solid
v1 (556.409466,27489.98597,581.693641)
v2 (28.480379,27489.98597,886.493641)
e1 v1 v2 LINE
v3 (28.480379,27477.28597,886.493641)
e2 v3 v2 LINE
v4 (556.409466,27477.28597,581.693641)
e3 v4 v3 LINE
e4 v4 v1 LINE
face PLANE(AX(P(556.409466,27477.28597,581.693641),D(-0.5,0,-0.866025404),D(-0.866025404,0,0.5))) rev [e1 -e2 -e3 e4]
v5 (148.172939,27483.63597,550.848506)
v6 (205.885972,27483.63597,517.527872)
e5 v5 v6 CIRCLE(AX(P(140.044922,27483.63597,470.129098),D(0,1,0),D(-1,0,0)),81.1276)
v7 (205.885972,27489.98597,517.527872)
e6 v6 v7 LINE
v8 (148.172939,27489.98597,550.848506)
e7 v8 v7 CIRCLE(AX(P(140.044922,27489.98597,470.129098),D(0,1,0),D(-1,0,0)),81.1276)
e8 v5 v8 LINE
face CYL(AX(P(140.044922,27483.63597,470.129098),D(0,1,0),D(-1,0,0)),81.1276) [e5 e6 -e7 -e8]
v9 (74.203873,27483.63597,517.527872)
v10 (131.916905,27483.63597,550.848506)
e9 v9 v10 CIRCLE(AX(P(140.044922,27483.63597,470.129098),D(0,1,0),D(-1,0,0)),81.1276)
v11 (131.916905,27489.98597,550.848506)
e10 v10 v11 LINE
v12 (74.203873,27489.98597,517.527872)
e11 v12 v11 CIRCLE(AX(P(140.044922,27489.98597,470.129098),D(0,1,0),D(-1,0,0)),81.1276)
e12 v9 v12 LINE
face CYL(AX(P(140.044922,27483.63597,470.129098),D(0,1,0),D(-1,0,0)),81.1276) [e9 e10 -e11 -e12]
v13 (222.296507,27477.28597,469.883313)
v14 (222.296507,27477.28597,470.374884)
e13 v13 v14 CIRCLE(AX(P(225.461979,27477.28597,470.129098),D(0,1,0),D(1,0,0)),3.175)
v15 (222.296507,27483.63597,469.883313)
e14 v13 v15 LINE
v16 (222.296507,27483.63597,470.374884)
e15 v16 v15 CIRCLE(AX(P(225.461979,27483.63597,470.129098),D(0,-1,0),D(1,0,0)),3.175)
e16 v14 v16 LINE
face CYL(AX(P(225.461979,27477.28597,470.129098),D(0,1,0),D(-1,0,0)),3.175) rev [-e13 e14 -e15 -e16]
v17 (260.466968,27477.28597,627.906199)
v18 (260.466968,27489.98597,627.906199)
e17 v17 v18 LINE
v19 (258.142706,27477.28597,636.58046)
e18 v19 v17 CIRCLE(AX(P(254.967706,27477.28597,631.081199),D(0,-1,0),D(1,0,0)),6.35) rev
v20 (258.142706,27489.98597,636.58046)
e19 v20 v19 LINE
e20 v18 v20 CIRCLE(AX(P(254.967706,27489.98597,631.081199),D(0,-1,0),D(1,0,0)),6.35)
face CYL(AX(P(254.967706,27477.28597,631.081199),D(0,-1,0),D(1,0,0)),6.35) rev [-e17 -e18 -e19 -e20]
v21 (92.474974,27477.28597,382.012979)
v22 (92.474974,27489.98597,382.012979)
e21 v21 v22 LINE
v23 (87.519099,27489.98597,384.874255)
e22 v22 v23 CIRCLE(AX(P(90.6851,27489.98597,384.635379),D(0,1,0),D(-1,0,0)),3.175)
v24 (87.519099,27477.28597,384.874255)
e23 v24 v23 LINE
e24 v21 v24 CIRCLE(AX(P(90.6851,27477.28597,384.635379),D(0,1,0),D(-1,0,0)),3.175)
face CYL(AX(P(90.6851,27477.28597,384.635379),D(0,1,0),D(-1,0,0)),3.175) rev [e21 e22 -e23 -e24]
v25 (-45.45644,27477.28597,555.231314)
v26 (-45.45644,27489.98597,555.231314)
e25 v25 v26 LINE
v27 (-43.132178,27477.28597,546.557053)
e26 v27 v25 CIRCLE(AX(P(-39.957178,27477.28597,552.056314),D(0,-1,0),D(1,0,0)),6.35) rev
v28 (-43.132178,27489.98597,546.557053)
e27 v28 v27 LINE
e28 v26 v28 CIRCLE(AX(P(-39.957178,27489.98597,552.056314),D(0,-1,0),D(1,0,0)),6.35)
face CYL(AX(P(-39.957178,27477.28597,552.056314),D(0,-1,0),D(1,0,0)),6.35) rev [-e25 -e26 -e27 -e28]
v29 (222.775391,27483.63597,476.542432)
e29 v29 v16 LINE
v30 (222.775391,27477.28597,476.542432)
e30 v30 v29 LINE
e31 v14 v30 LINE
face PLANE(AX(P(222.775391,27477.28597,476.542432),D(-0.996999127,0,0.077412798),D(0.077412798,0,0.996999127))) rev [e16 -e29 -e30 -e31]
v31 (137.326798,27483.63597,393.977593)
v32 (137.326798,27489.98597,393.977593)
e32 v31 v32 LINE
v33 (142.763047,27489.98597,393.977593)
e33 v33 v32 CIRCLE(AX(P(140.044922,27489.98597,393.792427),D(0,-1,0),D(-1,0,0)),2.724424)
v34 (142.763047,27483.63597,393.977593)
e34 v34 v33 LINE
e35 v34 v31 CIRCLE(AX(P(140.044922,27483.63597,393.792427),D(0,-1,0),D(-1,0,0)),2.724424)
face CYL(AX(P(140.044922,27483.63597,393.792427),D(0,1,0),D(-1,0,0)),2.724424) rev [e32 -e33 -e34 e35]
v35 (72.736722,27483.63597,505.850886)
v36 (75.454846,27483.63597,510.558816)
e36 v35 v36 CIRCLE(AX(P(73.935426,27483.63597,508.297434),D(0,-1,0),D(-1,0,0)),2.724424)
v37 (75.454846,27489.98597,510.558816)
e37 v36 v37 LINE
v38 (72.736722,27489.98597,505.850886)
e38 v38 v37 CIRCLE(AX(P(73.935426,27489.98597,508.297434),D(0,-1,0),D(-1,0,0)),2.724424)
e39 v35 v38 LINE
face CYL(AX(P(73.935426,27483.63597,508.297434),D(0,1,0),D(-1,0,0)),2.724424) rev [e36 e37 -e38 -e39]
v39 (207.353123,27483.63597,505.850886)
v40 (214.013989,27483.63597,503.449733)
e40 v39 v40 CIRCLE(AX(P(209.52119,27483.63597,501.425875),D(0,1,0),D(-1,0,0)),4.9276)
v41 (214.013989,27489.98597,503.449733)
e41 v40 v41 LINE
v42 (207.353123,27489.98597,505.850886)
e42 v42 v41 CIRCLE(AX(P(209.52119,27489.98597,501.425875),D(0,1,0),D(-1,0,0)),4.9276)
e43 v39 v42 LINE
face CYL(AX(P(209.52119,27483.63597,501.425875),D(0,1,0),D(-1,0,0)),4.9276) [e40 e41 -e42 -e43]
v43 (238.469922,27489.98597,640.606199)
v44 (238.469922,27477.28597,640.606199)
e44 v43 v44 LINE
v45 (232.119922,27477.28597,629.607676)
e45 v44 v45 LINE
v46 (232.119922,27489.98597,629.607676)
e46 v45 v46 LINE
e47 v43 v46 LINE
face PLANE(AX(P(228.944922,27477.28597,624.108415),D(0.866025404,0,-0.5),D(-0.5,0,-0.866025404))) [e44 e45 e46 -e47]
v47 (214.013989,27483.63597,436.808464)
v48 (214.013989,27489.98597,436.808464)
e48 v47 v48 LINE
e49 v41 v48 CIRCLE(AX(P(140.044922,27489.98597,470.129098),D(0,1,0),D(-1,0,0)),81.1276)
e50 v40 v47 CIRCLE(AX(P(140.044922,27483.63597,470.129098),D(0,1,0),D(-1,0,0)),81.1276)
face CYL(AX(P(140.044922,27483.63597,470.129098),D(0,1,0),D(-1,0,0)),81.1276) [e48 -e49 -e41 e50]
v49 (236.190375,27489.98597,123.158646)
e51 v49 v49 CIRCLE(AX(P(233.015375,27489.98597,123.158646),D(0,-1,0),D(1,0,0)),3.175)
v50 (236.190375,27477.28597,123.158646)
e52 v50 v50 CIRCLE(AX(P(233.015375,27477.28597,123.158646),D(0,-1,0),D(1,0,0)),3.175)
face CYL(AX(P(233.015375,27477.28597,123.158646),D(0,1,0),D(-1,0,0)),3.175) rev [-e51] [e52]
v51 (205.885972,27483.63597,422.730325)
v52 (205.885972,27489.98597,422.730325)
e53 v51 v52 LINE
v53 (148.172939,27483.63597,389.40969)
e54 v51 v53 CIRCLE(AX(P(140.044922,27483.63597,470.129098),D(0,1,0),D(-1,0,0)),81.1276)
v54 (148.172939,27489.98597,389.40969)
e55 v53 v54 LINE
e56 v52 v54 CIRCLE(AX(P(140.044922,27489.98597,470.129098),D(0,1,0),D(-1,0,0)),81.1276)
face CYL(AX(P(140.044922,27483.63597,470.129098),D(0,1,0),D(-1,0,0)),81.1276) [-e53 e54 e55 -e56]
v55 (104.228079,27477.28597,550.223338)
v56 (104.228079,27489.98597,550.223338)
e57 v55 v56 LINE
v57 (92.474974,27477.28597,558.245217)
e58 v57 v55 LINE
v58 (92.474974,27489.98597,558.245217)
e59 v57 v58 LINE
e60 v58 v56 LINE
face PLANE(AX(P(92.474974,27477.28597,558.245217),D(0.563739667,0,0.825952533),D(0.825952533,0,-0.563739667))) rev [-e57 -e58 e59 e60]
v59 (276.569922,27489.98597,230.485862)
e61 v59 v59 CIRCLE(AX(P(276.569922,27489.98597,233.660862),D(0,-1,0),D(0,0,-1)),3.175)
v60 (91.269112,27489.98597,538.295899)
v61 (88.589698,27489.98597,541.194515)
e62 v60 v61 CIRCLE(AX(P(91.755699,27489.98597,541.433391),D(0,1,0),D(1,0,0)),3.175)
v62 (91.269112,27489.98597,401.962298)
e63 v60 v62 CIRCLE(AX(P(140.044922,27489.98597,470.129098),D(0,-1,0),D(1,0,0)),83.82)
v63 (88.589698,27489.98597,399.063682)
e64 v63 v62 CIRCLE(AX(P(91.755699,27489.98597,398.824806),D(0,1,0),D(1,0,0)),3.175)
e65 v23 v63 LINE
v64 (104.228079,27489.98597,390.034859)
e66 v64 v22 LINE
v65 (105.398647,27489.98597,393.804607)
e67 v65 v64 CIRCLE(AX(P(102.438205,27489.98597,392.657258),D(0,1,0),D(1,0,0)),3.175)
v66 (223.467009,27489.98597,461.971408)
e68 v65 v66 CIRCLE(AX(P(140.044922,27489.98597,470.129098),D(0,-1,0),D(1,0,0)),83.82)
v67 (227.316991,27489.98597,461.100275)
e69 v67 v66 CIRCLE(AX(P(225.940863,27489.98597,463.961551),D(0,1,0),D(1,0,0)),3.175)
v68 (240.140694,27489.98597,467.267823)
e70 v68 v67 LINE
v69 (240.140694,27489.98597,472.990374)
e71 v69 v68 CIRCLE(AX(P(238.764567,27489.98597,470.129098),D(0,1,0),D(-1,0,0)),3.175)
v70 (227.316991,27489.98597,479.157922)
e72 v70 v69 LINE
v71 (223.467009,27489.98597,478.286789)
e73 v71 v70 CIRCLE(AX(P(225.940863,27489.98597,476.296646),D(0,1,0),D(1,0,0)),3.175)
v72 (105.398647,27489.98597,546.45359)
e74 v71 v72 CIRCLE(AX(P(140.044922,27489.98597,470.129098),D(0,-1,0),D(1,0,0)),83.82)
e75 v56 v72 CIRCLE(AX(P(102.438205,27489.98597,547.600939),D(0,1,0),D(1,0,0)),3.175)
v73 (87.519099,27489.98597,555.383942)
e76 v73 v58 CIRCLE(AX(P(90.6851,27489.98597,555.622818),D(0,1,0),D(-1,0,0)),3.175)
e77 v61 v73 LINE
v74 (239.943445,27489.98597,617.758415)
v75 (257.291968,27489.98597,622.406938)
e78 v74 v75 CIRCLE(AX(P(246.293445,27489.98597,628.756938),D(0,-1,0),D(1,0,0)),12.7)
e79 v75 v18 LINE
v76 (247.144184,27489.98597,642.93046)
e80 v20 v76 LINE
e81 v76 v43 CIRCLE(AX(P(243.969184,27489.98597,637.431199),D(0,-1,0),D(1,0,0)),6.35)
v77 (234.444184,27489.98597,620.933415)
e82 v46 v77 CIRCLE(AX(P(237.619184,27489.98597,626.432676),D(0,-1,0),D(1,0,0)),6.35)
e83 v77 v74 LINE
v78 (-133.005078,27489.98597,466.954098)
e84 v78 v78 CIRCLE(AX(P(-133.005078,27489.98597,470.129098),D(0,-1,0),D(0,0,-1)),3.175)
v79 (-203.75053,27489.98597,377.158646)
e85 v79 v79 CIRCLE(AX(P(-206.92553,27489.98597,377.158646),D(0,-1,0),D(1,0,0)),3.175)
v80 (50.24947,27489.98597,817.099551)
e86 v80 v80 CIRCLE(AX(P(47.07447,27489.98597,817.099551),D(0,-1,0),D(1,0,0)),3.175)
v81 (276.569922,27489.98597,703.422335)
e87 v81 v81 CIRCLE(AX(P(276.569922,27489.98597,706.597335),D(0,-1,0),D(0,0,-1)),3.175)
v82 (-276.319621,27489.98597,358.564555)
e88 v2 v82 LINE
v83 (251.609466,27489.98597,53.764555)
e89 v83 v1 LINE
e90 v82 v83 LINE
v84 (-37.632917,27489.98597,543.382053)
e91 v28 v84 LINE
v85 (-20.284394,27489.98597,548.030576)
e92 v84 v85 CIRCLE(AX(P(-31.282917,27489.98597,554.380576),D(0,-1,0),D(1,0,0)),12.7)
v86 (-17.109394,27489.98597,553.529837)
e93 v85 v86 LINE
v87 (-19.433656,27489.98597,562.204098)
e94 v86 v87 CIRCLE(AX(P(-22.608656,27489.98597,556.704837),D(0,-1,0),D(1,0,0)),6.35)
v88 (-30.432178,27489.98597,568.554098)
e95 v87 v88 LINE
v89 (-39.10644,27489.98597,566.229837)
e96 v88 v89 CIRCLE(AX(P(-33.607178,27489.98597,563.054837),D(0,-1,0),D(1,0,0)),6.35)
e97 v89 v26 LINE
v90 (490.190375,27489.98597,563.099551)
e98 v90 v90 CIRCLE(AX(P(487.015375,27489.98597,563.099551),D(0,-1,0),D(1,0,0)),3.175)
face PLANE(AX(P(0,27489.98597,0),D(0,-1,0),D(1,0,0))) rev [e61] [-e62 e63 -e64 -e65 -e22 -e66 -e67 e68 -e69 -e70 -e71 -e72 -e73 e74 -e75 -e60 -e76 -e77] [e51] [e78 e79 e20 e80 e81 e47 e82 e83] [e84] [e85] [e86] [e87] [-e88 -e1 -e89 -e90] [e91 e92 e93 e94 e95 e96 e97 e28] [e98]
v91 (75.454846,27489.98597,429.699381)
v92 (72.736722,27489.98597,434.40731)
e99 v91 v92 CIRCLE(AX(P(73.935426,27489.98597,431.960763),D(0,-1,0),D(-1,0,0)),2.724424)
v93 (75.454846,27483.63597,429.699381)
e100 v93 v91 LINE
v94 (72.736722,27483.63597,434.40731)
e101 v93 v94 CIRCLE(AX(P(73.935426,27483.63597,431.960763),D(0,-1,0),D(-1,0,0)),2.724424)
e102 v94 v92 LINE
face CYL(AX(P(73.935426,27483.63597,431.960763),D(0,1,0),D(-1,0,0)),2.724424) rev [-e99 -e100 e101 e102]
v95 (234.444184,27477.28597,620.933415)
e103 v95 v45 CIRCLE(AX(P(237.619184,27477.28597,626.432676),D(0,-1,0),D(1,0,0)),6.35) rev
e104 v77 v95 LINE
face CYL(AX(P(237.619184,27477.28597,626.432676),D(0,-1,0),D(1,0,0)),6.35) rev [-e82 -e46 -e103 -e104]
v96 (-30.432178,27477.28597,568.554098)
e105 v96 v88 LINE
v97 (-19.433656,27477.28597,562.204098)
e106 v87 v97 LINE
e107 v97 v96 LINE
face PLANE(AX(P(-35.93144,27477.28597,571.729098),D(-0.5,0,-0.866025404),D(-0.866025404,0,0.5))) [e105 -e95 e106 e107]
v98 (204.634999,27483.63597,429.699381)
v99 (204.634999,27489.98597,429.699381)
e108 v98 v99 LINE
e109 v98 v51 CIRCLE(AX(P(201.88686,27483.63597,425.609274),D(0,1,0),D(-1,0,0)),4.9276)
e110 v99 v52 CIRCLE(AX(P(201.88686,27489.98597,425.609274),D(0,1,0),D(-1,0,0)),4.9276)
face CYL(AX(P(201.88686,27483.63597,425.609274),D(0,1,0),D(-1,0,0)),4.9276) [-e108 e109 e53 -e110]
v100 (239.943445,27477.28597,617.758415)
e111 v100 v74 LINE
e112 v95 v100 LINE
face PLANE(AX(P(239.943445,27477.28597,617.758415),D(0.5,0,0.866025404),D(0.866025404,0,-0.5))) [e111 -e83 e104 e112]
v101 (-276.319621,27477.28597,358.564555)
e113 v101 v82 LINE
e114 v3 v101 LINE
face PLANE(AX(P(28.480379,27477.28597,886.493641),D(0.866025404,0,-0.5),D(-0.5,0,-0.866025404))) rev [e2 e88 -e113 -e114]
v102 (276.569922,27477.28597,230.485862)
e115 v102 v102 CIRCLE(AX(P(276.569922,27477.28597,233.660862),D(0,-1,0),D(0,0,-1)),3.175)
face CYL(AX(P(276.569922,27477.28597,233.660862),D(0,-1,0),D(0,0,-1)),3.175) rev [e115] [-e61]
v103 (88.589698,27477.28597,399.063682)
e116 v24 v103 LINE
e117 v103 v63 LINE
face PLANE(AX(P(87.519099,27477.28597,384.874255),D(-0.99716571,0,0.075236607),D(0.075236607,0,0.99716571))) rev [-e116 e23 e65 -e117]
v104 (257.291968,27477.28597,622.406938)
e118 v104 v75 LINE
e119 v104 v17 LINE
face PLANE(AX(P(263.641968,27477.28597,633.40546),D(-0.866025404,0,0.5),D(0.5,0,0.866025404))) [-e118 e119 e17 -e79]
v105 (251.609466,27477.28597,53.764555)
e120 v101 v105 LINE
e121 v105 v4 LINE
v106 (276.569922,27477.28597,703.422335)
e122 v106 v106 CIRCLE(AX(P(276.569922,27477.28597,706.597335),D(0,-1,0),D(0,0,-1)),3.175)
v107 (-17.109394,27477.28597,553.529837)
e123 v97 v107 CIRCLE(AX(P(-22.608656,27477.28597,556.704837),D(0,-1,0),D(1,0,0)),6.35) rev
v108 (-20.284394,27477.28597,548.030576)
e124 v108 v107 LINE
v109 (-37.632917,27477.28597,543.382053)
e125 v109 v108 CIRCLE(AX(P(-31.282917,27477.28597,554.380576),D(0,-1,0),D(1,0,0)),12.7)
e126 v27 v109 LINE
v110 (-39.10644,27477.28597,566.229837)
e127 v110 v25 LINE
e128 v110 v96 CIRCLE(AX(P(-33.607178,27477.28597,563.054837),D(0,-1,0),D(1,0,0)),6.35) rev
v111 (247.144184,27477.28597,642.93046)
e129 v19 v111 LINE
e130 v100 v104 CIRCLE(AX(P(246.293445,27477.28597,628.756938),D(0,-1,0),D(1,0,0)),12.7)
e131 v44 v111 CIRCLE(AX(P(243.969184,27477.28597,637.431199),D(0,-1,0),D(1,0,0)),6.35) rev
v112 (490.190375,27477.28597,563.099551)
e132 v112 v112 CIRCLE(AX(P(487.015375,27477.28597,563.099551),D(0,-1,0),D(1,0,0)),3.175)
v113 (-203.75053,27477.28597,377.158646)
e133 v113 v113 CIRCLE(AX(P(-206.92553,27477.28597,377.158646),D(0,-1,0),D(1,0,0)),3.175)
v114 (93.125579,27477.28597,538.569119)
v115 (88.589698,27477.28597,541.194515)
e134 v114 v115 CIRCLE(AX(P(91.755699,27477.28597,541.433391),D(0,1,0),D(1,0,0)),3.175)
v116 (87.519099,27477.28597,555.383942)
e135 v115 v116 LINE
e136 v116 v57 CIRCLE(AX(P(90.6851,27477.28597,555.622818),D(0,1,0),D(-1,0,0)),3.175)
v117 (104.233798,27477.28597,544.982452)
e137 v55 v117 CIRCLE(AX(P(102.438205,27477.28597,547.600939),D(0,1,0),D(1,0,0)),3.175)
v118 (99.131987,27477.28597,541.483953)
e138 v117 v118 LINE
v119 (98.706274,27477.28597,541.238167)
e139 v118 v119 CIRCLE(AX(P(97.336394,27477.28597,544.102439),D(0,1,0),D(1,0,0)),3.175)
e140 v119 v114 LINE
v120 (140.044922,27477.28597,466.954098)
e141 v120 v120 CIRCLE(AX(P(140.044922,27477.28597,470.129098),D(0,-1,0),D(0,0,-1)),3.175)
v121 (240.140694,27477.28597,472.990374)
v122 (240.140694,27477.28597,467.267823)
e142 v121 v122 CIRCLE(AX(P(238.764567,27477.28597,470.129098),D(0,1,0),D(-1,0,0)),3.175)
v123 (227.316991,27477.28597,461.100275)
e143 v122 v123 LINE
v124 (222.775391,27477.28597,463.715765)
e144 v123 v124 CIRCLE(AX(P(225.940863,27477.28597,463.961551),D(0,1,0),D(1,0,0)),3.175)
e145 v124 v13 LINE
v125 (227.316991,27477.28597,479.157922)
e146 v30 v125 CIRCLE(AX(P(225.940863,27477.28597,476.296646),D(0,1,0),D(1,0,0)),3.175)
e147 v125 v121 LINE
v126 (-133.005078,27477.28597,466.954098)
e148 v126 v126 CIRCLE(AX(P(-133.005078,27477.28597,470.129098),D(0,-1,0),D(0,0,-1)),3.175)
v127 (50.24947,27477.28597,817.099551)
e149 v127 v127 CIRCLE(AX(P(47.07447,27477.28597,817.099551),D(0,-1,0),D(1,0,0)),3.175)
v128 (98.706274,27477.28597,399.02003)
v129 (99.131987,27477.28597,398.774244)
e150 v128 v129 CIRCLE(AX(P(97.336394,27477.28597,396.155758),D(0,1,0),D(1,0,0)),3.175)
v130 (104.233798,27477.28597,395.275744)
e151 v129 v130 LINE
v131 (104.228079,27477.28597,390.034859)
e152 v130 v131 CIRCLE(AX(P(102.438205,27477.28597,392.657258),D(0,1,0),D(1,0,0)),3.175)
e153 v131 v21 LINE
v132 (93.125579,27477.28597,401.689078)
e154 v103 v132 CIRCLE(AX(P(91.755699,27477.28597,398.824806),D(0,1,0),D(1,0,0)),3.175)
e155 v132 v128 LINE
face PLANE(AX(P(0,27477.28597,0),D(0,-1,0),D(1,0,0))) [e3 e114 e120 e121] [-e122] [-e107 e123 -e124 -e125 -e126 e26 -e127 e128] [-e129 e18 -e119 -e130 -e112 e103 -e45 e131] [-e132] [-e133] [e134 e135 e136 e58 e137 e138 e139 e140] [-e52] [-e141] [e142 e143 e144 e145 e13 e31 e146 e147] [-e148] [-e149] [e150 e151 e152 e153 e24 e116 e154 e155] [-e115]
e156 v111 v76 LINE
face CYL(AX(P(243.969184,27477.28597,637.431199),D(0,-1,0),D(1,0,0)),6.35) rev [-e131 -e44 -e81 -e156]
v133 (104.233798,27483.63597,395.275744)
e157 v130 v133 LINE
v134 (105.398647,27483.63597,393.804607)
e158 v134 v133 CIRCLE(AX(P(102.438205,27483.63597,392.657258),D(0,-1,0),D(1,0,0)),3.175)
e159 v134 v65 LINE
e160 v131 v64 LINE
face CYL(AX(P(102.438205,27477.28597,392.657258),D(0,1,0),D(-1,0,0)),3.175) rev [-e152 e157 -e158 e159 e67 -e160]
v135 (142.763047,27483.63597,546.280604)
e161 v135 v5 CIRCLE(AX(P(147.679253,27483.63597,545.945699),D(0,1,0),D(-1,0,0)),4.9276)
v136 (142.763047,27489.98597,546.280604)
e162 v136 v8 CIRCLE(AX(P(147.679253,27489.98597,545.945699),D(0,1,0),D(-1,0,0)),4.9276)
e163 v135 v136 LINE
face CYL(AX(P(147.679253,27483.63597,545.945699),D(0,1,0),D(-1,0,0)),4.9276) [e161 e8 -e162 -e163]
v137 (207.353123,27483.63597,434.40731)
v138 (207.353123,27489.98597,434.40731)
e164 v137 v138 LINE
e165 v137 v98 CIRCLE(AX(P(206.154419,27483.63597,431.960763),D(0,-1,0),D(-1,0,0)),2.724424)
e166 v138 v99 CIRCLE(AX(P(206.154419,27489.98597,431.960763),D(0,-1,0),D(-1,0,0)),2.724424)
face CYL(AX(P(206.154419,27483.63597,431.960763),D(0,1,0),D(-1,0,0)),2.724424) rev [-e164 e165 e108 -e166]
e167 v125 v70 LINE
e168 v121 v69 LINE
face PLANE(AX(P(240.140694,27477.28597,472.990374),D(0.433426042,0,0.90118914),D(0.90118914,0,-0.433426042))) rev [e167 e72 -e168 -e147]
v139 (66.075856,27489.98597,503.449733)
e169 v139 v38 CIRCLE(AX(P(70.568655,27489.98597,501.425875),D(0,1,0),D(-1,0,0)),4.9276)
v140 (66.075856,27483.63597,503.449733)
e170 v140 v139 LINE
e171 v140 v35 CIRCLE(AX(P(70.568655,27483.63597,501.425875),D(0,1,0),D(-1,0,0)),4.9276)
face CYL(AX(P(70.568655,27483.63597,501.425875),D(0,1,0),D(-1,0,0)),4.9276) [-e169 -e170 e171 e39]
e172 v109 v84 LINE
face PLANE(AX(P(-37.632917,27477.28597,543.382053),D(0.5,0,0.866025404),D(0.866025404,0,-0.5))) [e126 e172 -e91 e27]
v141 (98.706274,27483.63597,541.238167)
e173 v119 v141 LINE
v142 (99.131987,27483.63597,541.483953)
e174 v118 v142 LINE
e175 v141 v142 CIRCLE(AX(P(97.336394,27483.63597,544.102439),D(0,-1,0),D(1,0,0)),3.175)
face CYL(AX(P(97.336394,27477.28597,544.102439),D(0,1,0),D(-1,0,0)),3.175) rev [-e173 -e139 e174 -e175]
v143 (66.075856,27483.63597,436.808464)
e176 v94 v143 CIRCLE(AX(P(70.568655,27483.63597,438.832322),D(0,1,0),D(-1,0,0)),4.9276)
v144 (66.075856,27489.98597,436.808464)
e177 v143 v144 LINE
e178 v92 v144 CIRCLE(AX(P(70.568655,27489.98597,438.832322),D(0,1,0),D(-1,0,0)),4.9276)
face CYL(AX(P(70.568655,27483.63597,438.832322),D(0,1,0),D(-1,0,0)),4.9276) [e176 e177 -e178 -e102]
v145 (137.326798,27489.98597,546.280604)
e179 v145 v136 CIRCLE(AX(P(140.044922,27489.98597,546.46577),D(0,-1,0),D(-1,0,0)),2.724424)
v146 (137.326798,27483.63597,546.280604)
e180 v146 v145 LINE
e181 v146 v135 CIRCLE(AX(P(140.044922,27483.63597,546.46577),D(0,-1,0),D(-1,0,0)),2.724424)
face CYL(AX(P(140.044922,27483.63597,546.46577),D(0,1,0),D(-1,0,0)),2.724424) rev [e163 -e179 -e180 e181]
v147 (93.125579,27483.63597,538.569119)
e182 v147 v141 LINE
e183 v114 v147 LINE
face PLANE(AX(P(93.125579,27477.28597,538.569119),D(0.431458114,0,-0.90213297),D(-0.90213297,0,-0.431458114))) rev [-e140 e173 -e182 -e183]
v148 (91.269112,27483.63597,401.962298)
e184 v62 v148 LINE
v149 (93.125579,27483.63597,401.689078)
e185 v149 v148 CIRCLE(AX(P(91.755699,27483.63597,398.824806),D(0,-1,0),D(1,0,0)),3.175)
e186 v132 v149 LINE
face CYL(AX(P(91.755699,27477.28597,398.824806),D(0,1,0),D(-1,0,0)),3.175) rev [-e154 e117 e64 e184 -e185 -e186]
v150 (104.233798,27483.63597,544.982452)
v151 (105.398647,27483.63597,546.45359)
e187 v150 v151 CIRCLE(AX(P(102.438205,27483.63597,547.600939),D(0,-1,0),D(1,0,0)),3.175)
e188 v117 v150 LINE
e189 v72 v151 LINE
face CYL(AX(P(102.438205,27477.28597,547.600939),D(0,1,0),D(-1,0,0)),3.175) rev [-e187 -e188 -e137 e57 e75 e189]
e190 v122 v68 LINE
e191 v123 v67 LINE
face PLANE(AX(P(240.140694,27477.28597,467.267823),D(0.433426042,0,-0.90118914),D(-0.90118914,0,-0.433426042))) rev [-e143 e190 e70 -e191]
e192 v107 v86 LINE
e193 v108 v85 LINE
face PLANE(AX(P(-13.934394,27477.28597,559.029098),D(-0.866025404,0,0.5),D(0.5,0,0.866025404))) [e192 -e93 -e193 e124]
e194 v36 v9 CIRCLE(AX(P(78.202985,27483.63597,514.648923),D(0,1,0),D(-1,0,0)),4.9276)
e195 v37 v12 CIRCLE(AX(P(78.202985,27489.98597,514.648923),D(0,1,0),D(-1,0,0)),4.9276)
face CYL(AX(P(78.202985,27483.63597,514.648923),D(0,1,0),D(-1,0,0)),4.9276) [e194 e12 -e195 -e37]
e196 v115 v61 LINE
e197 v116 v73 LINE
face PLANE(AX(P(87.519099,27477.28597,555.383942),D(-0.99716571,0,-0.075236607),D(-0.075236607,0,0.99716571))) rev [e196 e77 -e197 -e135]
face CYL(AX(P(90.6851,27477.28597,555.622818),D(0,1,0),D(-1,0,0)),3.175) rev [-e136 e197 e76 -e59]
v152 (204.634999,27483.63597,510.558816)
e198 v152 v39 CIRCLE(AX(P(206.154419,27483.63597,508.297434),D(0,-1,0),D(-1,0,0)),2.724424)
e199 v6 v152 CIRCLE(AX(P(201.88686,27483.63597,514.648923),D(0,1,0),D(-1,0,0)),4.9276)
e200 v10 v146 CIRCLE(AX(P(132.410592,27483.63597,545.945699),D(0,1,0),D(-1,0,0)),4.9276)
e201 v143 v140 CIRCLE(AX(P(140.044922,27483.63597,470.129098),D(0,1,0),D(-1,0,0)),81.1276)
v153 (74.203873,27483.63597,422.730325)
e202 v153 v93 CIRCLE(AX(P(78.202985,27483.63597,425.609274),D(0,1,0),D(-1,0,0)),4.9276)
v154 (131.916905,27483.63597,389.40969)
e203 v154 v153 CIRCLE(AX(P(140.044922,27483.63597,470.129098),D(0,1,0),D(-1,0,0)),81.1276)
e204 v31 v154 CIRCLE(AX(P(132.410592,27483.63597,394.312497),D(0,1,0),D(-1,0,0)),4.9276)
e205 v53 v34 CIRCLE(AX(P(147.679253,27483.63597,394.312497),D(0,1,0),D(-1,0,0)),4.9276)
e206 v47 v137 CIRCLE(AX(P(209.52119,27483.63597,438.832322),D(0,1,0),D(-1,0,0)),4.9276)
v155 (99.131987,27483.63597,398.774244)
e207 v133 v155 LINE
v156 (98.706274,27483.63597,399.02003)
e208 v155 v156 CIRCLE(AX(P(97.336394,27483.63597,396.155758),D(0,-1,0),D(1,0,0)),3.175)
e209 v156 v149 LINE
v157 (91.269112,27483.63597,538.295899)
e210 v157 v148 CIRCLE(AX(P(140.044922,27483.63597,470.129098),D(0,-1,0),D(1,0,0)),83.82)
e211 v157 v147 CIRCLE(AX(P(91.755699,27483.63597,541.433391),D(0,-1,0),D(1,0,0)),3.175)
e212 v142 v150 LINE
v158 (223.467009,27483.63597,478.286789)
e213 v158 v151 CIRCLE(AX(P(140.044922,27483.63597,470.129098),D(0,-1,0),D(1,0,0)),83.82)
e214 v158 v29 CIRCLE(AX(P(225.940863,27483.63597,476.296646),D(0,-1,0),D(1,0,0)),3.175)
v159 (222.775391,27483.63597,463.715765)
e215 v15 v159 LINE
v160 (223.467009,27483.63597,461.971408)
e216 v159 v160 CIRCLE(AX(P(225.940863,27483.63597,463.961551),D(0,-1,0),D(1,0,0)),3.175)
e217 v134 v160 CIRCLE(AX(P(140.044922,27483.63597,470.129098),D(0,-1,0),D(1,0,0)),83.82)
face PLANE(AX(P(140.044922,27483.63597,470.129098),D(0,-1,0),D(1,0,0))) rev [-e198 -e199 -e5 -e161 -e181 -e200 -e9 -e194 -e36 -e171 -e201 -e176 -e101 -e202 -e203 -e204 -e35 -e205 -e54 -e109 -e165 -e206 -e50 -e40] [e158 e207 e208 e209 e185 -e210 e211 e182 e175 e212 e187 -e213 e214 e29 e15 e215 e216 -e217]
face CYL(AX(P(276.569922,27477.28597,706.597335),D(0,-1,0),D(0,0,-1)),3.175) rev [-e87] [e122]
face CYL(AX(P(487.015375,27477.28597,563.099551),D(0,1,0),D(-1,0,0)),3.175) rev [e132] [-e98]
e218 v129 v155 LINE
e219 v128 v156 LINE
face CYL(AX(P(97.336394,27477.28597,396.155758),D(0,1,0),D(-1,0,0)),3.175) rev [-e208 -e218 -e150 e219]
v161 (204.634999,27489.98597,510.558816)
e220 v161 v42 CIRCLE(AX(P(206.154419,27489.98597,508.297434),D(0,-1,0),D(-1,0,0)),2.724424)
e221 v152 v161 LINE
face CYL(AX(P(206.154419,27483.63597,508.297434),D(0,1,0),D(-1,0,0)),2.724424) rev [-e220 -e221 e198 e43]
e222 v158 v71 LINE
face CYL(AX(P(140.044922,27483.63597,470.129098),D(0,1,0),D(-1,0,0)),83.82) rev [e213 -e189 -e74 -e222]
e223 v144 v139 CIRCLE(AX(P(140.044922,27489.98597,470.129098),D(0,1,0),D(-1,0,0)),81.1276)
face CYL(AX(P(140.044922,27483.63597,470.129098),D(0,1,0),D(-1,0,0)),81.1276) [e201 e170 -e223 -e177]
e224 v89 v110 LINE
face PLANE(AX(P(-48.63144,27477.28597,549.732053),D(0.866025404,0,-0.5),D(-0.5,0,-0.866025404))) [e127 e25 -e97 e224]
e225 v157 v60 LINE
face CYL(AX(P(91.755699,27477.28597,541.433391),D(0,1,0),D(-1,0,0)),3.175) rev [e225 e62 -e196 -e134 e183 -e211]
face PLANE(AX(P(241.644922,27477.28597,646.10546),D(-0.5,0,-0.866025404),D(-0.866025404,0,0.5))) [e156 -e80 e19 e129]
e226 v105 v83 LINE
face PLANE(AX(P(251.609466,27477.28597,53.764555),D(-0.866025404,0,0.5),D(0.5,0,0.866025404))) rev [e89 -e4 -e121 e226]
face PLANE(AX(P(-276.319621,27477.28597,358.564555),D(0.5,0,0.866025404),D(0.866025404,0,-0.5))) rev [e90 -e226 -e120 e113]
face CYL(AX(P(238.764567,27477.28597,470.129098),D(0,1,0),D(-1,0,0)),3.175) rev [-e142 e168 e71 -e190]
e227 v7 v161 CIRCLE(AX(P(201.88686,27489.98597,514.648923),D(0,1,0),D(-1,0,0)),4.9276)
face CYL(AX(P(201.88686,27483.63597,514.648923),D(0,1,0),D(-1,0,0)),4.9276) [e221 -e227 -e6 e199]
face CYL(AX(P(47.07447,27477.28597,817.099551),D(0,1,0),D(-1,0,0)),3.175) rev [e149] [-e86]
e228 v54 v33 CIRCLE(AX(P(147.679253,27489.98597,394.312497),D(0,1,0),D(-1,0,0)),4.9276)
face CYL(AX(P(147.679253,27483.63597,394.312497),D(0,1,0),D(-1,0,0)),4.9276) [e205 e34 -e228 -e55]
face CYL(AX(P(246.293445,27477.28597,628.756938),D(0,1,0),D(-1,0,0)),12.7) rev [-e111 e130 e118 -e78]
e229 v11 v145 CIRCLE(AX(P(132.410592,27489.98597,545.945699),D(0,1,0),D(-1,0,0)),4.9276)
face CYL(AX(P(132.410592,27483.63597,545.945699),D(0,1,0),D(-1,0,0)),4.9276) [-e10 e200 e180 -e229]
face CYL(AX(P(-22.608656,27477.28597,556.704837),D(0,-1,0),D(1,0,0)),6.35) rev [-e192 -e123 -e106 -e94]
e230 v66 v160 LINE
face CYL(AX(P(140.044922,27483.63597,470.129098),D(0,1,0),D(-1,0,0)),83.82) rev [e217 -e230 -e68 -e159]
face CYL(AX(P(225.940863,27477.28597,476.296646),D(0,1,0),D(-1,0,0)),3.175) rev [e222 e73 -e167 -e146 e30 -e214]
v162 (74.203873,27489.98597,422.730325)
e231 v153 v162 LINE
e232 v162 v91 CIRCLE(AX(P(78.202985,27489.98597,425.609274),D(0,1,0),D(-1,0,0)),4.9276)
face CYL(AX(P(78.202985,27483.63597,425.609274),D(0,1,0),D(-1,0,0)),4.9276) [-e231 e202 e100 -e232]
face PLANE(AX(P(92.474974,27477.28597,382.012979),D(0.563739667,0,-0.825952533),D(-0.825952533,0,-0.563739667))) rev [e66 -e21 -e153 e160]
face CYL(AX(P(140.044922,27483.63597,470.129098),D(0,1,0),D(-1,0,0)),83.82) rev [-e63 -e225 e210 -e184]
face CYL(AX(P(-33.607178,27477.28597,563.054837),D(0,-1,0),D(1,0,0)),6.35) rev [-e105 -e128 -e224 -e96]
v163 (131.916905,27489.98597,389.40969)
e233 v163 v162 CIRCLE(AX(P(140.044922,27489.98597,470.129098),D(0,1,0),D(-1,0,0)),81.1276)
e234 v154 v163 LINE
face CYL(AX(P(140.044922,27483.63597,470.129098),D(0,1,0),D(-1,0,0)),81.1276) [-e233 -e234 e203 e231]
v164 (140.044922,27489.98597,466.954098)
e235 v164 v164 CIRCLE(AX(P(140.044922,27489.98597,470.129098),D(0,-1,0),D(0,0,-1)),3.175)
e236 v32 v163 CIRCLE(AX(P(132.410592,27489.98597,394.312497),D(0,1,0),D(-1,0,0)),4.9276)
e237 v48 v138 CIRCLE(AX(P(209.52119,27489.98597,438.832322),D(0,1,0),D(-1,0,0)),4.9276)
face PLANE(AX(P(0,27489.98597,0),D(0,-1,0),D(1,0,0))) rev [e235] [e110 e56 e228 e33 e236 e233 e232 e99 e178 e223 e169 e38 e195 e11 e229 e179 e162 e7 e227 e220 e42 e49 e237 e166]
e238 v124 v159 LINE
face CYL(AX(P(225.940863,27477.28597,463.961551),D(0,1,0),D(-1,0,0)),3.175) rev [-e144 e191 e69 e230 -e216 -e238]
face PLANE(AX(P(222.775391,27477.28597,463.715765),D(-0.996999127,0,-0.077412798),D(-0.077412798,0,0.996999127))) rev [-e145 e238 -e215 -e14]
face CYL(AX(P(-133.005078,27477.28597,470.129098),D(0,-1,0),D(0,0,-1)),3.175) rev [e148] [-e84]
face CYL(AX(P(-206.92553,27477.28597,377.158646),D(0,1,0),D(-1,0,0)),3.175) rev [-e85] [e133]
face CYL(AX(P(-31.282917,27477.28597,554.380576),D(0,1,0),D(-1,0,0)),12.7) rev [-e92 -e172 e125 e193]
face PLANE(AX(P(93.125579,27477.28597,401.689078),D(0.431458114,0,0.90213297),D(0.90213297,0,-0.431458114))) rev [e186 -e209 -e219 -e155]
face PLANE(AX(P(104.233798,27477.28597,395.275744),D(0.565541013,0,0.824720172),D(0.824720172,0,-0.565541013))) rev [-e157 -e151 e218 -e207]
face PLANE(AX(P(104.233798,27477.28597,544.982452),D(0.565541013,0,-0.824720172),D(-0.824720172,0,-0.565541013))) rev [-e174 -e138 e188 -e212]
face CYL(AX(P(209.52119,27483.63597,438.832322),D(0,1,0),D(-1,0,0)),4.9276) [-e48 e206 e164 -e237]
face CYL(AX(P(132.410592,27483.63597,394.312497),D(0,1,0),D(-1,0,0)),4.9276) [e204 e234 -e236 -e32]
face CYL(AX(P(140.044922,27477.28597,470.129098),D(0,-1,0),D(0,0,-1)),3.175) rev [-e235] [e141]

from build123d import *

# Parameters (mm, degrees)
SKETCH1_R                   = 3.175
BOSS_EXTRUDE1_DEPTH         = 12.7
SKETCH3_R                   = 83.82
SKETCH3_R_2                 = 81.9404
CUT_EXTRUDE1_DEPTH          = 6.35
CUT_EXTRUDE2_START          = -6.35
CUT_EXTRUDE2_OUTLINE_R      = 81.9404
CUT_EXTRUDE2_DEPTH          = 6.35
F_1_4_0_25_DIAMETER_HOLE1_D = 6.35
FILLET1_R                   = 6.35
CUT_EXTRUDE3_DEPTH          = 1047.720478305


# Read off the part's stored shape, not the designer's step: Cut-Extrude2
with BuildPart() as part:
    # Sketch1 → Boss-Extrude1 (new body)
    with BuildSketch(Plane.XZ.offset(-27489.985969718)):
        Polygon((556.409465543, 581.693641464), (28.480379396, 886.493641464), (-276.319620604, 358.564555317), (251.609465543, 53.764555317), align=None)
        with Locations((-206.925530091, 377.158645829)):
            Circle(SKETCH1_R, mode=Mode.SUBTRACT)
        with Locations((233.015375031, 123.158645829)):
            Circle(SKETCH1_R, mode=Mode.SUBTRACT)
        with Locations((487.015375031, 563.099550952)):
            Circle(SKETCH1_R, mode=Mode.SUBTRACT)
        with Locations((47.074469909, 817.099550952)):
            Circle(SKETCH1_R, mode=Mode.SUBTRACT)
        with BuildLine():
            Line((-37.632916951, 543.382053135), (-48.631439579, 549.732053135))
            Line((-48.631439579, 549.732053135), (-35.931439579, 571.729098391))
            Line((-35.931439579, 571.729098391), (-13.934394323, 559.029098391))
            Line((-13.934394323, 559.029098391), (-20.284394323, 548.030575763))
            ThreePointArc((-20.284394323, 548.030575763), (-27.995915078, 542.113317769), (-37.632916951, 543.382053135))
        make_face(mode=Mode.SUBTRACT)
        with BuildLine():
            Line((241.64492247, 646.10546044), (263.641967726, 633.40546044))
            Line((263.641967726, 633.40546044), (257.291967726, 622.406937812))
            ThreePointArc((257.291967726, 622.406937812), (249.580446971, 616.489679818), (239.943445098, 617.758415184))
            Line((239.943445098, 617.758415184), (228.94492247, 624.108415184))
            Line((228.94492247, 624.108415184), (241.64492247, 646.10546044))
        make_face(mode=Mode.SUBTRACT)
    extrude(amount=BOSS_EXTRUDE1_DEPTH)

    # Sketch3 → Cut-Extrude1 (cut)
    with BuildSketch(Plane.XZ.offset(-27489.985969718)):
        with Locations((140.04492247, 470.129098391)):
            Circle(SKETCH3_R)
        with Locations((140.04492247, 470.129098391)):
            Circle(SKETCH3_R_2, mode=Mode.SUBTRACT)
    extrude(amount=CUT_EXTRUDE1_DEPTH, mode=Mode.SUBTRACT)

    # Cut-Extrude2 outline → Cut-Extrude2 (cut)
    with BuildSketch(Plane(origin=(0, 27489.985969718, 0), x_dir=(1, 0, 0), z_dir=(0, 1, 0)).offset(CUT_EXTRUDE2_START)):
        with Locations((140.04492247, -470.129098391)):
            Circle(CUT_EXTRUDE2_OUTLINE_R)
        with BuildLine():
            ThreePointArc((74.203873091, -422.730325217), (99.48112247, -399.870535843), (131.916905483, -389.409690429))
            ThreePointArc((131.916905483, -389.409690429), (135.589601797, -390.547508644), (137.326798106, -393.977592825))
            ThreePointArc((137.326798106, -393.977592825), (140.04492247, -396.516851306), (142.763046834, -393.977592825))
            ThreePointArc((142.763046834, -393.977592825), (144.500243143, -390.547508644), (148.172939457, -389.409690429))
            ThreePointArc((148.172939457, -389.409690429), (180.60872247, -399.870535843), (205.885971849, -422.730325217))
            ThreePointArc((205.885971849, -422.730325217), (206.736940528, -426.479882633), (204.634998644, -429.699380858))
            ThreePointArc((204.634998644, -429.699380858), (203.794998475, -433.322974849), (207.353123009, -434.407310358))
            ThreePointArc((207.353123009, -434.407310358), (211.192261201, -434.196724402), (214.013988837, -436.808463603))
            ThreePointArc((214.013988837, -436.808463603), (221.17252247, -470.129098391), (214.013988837, -503.449733178))
            ThreePointArc((214.013988837, -503.449733178), (211.192261202, -506.06147238), (207.353123009, -505.850886424))
            ThreePointArc((207.353123009, -505.850886424), (203.794998475, -506.935221933), (204.634998644, -510.558815924))
            ThreePointArc((204.634998644, -510.558815924), (206.736940528, -513.778314149), (205.885971849, -517.527871565))
            ThreePointArc((205.885971849, -517.527871565), (180.60872247, -540.387660939), (148.172939457, -550.848506352))
            ThreePointArc((148.172939457, -550.848506352), (144.500243143, -549.710688138), (142.763046834, -546.280603957))
            ThreePointArc((142.763046834, -546.280603957), (140.04492247, -543.741345476), (137.326798106, -546.280603957))
            ThreePointArc((137.326798106, -546.280603957), (135.589601797, -549.710688138), (131.916905483, -550.848506352))
            ThreePointArc((131.916905483, -550.848506352), (99.48112247, -540.387660939), (74.203873091, -517.527871565))
            ThreePointArc((74.203873091, -517.527871565), (73.352904412, -513.778314149), (75.454846296, -510.558815924))
            ThreePointArc((75.454846296, -510.558815924), (76.294846465, -506.935221933), (72.736721931, -505.850886424))
            ThreePointArc((72.736721931, -505.850886424), (68.897583739, -506.06147238), (66.075856104, -503.449733178))
            ThreePointArc((66.075856104, -503.449733178), (58.91732247, -470.12909839), (66.075856104, -436.808463603))
            ThreePointArc((66.075856104, -436.808463603), (68.897583739, -434.196724402), (72.736721931, -434.407310358))
            ThreePointArc((72.736721931, -434.407310358), (76.294846465, -433.322974849), (75.454846296, -429.699380858))
            ThreePointArc((75.454846296, -429.699380858), (73.352904412, -426.479882633), (74.203873091, -422.730325217))
        make_face(mode=Mode.SUBTRACT)
    extrude(amount=CUT_EXTRUDE2_DEPTH, mode=Mode.SUBTRACT)

    # 1/4 (0.25) Diameter Hole1 (through all)
    with Locations(Plane(origin=(0, 27477.285969718, 0), x_dir=(-1, 0, 0), z_dir=(0, -1, 0))):
        with Locations((-276.56992247, -706.597334894), (-276.56992247, -233.660861887), (133.00507753, -470.129098391), (-140.04492247, -470.129098391)):
            Hole(F_1_4_0_25_DIAMETER_HOLE1_D / 2)

    # Fillet1
    fillet1_edges = [part.edges().sort_by_distance(p)[0] for p in [
        (-13.934394323, 27483.635969718, 559.029098391),
        (-35.931439579, 27483.635969718, 571.729098391),
        (-48.631439579, 27483.635969718, 549.732053135),
        (241.64492247, 27483.635969718, 646.10546044),
        (228.94492247, 27483.635969718, 624.108415184),
        (263.641967726, 27483.635969718, 633.40546044),
    ]]
    fillet(fillet1_edges, radius=FILLET1_R)

    # Sketch7 → Cut-Extrude3 (cut, through all)
    with BuildSketch(Plane(origin=(0, 27489.985969718, 0), x_dir=(1, 0, 0), z_dir=(0, 1, 0))):
        with BuildLine():
            Line((87.519099271, -555.383941842), (88.589697985, -541.194514974))
            ThreePointArc((88.589697985, -541.194514974), (90.165199445, -538.685494585), (93.125578624, -538.569119019))
            Line((93.125578624, -538.569119019), (98.706273756, -541.238167012))
            ThreePointArc((98.706273756, -541.238167012), (98.923894245, -541.352808536), (99.131986961, -541.483952646))
            Line((99.131986961, -541.483952646), (104.233797894, -544.982452404))
            ThreePointArc((104.233797894, -544.982452404), (105.613203287, -547.604403762), (104.228078621, -550.223338244))
            Line((104.228078621, -550.223338244), (92.474973845, -558.245217361))
            ThreePointArc((92.474973845, -558.245217361), (89.0976004, -558.372448725), (87.519099271, -555.383941842))
        make_face()
        with BuildLine():
            Line((92.474973844, -382.01297942), (104.228078621, -390.034858537))
            ThreePointArc((104.228078621, -390.034858537), (105.613203286, -392.65379302), (104.233797893, -395.275744378))
            Line((104.233797893, -395.275744378), (99.131986961, -398.774244135))
            ThreePointArc((99.131986961, -398.774244135), (98.923894245, -398.905388245), (98.706273756, -399.020029769))
            Line((98.706273756, -399.020029769), (93.125578624, -401.689077763))
            ThreePointArc((93.125578624, -401.689077763), (90.165199444, -401.572702196), (88.589697984, -399.063681808))
            Line((88.589697984, -399.063681808), (87.519099271, -384.874254939))
            ThreePointArc((87.519099271, -384.874254939), (89.0976004, -381.885748056), (92.474973844, -382.01297942))
        make_face()
        with BuildLine():
            Line((240.140694294, -472.990373909), (227.316990804, -479.157921661))
            ThreePointArc((227.316990804, -479.157921661), (224.356364679, -479.048007567), (222.775390892, -476.542431776))
            Line((222.775390892, -476.542431776), (222.296506693, -470.374884024))
            ThreePointArc((222.296506693, -470.374884024), (222.28697892, -470.12909839), (222.296506693, -469.883312757))
            Line((222.296506693, -469.883312757), (222.775390892, -463.715765005))
            ThreePointArc((222.775390892, -463.715765005), (224.356364679, -461.210189214), (227.316990804, -461.10027512))
            Line((227.316990804, -461.10027512), (240.140694294, -467.267822872))
            ThreePointArc((240.140694294, -467.267822872), (241.939566609, -470.12909839), (240.140694294, -472.990373909))
        make_face()
    extrude(amount=-CUT_EXTRUDE3_DEPTH, mode=Mode.SUBTRACT)


solid = part.part
